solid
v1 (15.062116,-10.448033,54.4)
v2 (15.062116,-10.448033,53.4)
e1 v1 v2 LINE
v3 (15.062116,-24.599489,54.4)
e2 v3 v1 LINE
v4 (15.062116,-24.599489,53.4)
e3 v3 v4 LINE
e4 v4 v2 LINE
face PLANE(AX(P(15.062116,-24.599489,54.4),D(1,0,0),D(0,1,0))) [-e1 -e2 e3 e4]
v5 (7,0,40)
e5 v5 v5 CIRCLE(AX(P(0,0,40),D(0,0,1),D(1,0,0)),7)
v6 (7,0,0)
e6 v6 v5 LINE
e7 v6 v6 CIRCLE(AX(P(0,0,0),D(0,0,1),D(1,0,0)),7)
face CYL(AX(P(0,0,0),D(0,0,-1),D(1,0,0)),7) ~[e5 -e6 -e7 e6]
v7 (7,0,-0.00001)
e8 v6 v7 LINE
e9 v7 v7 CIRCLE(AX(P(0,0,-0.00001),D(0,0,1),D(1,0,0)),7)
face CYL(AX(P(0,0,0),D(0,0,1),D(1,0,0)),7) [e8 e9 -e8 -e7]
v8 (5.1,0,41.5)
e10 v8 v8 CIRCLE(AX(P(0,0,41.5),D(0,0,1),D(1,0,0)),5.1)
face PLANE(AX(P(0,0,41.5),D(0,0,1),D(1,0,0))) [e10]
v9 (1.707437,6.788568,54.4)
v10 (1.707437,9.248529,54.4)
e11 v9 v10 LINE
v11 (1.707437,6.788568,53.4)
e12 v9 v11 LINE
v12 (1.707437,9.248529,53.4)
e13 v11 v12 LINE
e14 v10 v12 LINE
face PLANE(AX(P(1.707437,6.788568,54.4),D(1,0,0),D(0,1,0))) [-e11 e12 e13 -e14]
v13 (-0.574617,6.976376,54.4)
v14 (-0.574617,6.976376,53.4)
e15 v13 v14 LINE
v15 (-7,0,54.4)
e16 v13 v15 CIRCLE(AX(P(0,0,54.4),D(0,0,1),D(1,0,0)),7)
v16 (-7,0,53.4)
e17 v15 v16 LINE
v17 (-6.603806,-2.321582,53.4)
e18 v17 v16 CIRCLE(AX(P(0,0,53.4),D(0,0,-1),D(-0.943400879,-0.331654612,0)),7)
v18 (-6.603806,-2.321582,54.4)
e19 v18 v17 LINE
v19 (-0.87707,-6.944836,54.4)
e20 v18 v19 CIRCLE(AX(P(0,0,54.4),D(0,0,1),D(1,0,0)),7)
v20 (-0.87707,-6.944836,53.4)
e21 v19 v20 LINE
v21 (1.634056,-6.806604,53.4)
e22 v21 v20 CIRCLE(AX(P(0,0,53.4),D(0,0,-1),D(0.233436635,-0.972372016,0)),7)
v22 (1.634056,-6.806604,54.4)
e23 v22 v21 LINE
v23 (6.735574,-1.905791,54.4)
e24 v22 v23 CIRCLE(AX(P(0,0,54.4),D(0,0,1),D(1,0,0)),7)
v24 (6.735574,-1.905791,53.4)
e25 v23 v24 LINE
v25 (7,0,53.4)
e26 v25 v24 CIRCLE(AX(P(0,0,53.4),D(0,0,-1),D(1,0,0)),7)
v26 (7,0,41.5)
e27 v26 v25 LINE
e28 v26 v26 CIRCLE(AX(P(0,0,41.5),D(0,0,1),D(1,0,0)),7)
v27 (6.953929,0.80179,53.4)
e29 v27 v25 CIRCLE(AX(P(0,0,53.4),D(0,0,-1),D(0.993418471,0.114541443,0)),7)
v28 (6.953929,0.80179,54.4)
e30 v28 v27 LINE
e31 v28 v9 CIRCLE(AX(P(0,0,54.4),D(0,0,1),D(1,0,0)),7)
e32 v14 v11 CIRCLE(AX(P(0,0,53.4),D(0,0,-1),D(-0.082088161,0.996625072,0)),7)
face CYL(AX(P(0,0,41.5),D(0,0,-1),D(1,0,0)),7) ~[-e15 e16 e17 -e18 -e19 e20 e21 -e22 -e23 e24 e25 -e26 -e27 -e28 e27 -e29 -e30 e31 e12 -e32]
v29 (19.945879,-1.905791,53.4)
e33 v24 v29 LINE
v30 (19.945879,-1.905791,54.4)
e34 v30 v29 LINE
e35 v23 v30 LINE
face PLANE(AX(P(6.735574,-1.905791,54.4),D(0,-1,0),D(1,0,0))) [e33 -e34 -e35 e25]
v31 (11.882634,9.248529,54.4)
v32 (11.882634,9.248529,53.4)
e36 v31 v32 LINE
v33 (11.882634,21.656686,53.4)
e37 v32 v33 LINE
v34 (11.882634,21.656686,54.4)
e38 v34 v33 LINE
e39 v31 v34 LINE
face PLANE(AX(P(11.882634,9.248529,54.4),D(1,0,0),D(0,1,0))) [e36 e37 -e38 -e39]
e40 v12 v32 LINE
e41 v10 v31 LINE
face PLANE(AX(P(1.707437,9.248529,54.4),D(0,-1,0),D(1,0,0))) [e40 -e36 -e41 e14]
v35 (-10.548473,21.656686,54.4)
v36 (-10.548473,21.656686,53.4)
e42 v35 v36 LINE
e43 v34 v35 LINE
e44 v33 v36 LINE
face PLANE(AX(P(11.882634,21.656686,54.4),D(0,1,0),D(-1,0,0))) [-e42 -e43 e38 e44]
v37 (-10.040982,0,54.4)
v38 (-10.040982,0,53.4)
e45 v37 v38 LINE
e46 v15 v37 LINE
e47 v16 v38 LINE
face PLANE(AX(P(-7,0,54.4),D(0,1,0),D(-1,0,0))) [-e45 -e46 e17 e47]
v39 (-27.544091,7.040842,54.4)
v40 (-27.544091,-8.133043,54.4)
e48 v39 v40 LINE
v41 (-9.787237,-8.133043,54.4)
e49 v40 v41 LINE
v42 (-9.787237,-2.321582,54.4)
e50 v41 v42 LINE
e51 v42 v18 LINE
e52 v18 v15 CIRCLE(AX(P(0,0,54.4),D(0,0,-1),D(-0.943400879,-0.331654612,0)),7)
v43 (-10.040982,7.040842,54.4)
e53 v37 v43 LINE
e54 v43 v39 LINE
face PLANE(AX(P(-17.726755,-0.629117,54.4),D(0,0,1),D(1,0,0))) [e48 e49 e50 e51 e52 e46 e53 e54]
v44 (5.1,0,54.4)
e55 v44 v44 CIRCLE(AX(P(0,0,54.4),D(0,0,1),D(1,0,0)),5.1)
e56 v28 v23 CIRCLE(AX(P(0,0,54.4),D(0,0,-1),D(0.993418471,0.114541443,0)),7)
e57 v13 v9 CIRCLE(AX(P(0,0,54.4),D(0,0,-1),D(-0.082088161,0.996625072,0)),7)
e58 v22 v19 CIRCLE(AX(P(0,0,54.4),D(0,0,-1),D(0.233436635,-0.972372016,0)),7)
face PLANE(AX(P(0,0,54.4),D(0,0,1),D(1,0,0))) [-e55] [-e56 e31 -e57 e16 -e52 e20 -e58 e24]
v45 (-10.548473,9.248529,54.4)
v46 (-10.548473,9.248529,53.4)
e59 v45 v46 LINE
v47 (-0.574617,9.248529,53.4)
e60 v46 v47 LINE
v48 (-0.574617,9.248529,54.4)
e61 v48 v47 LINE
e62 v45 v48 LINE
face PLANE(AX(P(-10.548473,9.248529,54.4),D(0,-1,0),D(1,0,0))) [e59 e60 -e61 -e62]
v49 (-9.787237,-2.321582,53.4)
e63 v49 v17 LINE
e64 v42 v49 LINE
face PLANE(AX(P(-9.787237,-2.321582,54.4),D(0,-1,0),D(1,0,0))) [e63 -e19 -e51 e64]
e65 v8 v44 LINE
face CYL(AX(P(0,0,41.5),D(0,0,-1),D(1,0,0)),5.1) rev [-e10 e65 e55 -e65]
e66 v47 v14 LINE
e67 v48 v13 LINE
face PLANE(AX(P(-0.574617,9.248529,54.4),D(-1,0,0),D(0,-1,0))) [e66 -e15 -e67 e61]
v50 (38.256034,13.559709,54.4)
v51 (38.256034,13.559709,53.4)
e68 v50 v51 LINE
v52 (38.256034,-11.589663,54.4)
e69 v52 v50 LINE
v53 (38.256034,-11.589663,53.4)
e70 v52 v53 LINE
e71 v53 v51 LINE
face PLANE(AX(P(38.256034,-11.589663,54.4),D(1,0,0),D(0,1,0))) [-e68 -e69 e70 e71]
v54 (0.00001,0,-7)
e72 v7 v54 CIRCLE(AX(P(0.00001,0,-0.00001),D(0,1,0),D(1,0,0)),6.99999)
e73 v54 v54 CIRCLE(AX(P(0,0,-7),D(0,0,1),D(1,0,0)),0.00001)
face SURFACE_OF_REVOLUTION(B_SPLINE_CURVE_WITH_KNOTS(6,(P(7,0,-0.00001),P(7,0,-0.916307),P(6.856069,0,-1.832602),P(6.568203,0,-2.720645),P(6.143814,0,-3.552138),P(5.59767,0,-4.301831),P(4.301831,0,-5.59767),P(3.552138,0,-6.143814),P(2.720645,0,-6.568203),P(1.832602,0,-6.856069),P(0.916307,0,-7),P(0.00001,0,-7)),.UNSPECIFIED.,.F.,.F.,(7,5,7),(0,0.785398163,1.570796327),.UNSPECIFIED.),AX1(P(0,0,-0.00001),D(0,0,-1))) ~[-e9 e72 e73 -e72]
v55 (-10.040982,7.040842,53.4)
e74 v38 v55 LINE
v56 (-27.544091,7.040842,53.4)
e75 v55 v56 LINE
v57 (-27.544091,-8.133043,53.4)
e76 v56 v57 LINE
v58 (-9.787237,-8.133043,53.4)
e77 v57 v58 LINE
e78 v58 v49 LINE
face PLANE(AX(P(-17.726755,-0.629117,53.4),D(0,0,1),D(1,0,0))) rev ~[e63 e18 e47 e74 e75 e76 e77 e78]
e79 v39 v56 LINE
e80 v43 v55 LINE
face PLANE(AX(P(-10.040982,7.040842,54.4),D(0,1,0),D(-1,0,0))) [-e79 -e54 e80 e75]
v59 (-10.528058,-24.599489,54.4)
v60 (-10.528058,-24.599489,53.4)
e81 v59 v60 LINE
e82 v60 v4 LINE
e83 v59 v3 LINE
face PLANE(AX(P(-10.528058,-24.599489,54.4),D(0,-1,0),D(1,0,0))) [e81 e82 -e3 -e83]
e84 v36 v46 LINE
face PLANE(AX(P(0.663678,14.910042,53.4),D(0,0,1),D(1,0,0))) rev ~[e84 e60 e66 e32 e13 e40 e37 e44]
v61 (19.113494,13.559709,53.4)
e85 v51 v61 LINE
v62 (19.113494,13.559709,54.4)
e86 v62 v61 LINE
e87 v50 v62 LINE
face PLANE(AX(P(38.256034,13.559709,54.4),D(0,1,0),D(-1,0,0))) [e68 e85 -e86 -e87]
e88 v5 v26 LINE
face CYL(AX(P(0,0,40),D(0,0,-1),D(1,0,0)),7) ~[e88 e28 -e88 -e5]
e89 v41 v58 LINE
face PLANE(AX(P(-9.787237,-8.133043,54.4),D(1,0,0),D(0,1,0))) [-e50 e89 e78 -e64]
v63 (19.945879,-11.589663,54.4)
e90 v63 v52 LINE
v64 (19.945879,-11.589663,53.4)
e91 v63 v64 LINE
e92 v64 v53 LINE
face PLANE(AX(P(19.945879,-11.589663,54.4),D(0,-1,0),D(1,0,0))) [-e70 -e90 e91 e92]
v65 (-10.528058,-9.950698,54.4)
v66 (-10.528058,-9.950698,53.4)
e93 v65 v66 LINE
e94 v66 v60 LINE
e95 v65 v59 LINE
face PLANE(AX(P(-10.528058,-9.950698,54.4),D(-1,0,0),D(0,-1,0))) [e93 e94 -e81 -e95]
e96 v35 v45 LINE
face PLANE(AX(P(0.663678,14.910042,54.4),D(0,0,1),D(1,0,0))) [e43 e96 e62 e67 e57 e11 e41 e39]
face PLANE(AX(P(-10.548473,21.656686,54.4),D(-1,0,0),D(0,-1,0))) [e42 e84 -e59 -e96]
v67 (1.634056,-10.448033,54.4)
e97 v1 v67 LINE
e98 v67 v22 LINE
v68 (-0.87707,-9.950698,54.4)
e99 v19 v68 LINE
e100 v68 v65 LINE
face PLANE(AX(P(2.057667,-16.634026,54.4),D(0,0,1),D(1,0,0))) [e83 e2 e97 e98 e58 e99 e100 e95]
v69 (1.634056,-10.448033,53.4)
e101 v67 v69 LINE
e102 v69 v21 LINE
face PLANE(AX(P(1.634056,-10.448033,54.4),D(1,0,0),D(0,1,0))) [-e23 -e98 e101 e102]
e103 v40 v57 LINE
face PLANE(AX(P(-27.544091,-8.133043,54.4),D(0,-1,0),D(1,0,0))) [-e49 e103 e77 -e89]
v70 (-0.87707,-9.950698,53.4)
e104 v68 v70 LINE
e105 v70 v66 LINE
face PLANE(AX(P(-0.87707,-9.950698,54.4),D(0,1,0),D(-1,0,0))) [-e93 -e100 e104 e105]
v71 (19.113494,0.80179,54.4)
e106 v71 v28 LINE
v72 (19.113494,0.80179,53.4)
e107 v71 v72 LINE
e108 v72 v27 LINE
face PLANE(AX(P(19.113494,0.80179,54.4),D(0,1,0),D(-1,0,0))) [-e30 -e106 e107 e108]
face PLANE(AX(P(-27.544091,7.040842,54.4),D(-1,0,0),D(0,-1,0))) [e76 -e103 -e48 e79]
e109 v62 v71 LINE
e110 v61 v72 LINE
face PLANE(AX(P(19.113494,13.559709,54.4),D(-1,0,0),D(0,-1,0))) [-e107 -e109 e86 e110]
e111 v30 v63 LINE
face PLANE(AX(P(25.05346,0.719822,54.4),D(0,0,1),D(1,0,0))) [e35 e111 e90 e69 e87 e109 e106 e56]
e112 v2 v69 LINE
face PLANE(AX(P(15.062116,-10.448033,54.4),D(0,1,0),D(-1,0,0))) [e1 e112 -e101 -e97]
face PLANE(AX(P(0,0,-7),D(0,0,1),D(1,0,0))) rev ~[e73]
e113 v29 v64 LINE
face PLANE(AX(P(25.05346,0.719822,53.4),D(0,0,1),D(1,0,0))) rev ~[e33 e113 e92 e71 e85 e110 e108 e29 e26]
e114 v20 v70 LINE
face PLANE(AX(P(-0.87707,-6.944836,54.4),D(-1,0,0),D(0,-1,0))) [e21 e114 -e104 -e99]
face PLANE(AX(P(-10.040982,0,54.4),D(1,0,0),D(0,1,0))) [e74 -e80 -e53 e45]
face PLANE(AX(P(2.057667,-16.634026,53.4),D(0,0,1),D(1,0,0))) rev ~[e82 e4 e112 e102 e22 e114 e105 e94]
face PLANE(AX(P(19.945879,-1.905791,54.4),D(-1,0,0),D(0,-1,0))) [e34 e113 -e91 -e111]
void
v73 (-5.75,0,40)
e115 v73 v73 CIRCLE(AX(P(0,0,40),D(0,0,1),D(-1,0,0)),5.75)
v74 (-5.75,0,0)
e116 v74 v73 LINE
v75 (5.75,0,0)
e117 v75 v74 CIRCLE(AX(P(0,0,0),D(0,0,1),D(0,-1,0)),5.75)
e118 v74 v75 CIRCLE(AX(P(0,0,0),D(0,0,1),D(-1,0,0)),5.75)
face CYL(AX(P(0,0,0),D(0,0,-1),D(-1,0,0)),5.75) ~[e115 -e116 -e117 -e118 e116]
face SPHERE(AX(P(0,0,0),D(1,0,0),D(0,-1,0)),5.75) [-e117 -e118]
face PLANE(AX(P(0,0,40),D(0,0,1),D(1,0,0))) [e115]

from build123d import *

# Parameters (mm, degrees)
F0_R      = 7
F1_DEPTH  = 7
F2_R      = 6.99999
F4_DEPTH  = 40
F5_R      = 7
F5_R_2    = 5.75
F6_DEPTH  = 1.5
F7_R      = 7
F7_R_2    = 5.1
F8_DEPTH  = 12.9
F10_DEPTH = 1


# Not quite as in the source:
# - a fillet or chamfer is up to 0.001 mm smaller than in the source, because OpenCascade refuses the exact size


with BuildPart() as f1:
    # F0 (on Top) → F1 (new body)
    with BuildSketch(Plane.XY):
        Circle(F0_R)
        with BuildLine():
            ThreePointArc((-5.75, 0), (0, 5.75), (5.75, 0))
            ThreePointArc((5.75, 0), (0, -5.75), (-5.75, 0))
        make_face(mode=Mode.SUBTRACT)
        with BuildLine():
            Line((-5.75, 0), (5.75, 0))
            ThreePointArc((5.75, 0), (0, 5.75), (-5.75, 0))
        make_face()
        with BuildLine():
            ThreePointArc((-5.75, 0), (0, -5.75), (5.75, 0))
            Line((5.75, 0), (-5.75, 0))
        make_face()
    extrude(amount=-F1_DEPTH)

    # F2 (radius 7 in the source; OpenCascade refuses exactly that, so slightly less here)
    f2_edges = [f1.edges().sort_by_distance(p)[0] for p in [
        (-7, 0, -7),
    ]]
    fillet(f2_edges, radius=F2_R)

    # F0 (on Top) → F3 (revolve, cut)
    with BuildSketch(Plane.XY):
        with BuildLine():
            ThreePointArc((-5.75, 0), (0, -5.75), (5.75, 0))
            Line((5.75, 0), (-5.75, 0))
        make_face()
    revolve(axis=Axis((0, 0, 0), (1, 0, 0)), mode=Mode.SUBTRACT)

    # F4 (add): a face of the model
    f4_faces = [f1.faces().sort_by_distance(p)[0] for p in [
        (-6.8020101013, 0, 0),
    ]]
    extrude(f4_faces, amount=F4_DEPTH)

    # F5 (on face) → F6 (join)
    with BuildSketch(Plane.XY.offset(40)):
        Circle(F5_R)
        Circle(F5_R_2, mode=Mode.SUBTRACT)
        Circle(F5_R_2)
    extrude(amount=F6_DEPTH)

    # F7 (on face) → F8 (join)
    with BuildSketch(Plane.XY.offset(41.5)):
        Circle(F7_R)
        Circle(F7_R_2, mode=Mode.SUBTRACT)
    extrude(amount=F8_DEPTH)

    # F9 (on face) → F10 (join)
    with BuildSketch(Plane.XY.offset(54.4)):
        with BuildLine():
            ThreePointArc((-6.6038061512, -2.3215822875), (-6.9002406863, -1.1775731276), (-7, 0))
            Line((-7, 0), (-10.0409816951, 0))
            Line((-10.0409816951, 0), (-10.0409816951, 7.0408415049))
            Line((-10.0409816951, 7.0408415049), (-27.5440905243, 7.0408415049))
            Line((-27.5440905243, 7.0408415049), (-27.5440905243, -6.5598203801))
            Line((-27.5440905243, -6.5598203801), (-27.5440905243, -8.1330426037))
            Line((-27.5440905243, -8.1330426037), (-9.7872372717, -8.1330426037))
            Line((-9.7872372717, -8.1330426037), (-9.7872372717, -2.3215822875))
            Line((-9.7872372717, -2.3215822875), (-6.6038061512, -2.3215822875))
        make_face()
        with BuildLine():
            Line((-0.5746171277, 9.2485286327), (-0.5746171277, 6.9763755028))
            ThreePointArc((-0.5746171277, 6.9763755028), (0.5741414209, 6.9764146686), (1.7074374482, 6.7885681377))
            Line((1.7074374482, 6.7885681377), (1.7074374482, 9.2485286327))
            Line((1.7074374482, 9.2485286327), (11.8826339021, 9.2485286327))
            Line((11.8826339021, 9.2485286327), (11.8826339021, 21.6566864401))
            Line((11.8826339021, 21.6566864401), (-10.5484733358, 21.6566864401))
            Line((-10.5484733358, 21.6566864401), (-10.5484733358, 9.2485286327))
            Line((-10.5484733358, 9.2485286327), (-7.0214094594, 9.2485286327))
            Line((-7.0214094594, 9.2485286327), (-0.5746171277, 9.2485286327))
        make_face()
        with BuildLine():
            Line((14.655204518, 0.8017900982), (6.9539292949, 0.8017900982))
            ThreePointArc((6.9539292949, 0.8017900982), (6.9884728326, 0.4015563072), (7, 0))
            ThreePointArc((7, 0), (6.9335784443, -0.9620238859), (6.735574298, -1.9057908794))
            Line((6.735574298, -1.9057908794), (19.9458785355, -1.9057908794))
            Line((19.9458785355, -1.9057908794), (19.9458785355, -11.5896631032))
            Line((19.9458785355, -11.5896631032), (38.256034255, -11.5896631032))
            Line((38.256034255, -11.5896631032), (38.256034255, 13.5597093031))
            Line((38.256034255, 13.5597093031), (19.1134941834, 13.5597093031))
            Line((19.1134941834, 13.5597093031), (19.1134941834, 0.8017900982))
            Line((19.1134941834, 0.8017900982), (14.655204518, 0.8017900982))
        make_face()
        with BuildLine():
            ThreePointArc((1.6340564471, -6.8066041113), (0.3847522235, -6.989418125), (-0.8770696547, -6.9448361263))
            Line((-0.8770696547, -6.9448361263), (-0.8770696547, -9.9506975346))
            Line((-0.8770696547, -9.9506975346), (-10.5280578136, -9.9506975346))
            Line((-10.5280578136, -9.9506975346), (-10.5280578136, -24.5994888246))
            Line((-10.5280578136, -24.5994888246), (15.0621160865, -24.5994888246))
            Line((15.0621160865, -24.5994888246), (15.0621160865, -10.4480329901))
            Line((15.0621160865, -10.4480329901), (1.6340564471, -10.4480329901))
            Line((1.6340564471, -10.4480329901), (1.6340564471, -6.8066041113))
        make_face()
    extrude(amount=-F10_DEPTH)


solid = f1.part
